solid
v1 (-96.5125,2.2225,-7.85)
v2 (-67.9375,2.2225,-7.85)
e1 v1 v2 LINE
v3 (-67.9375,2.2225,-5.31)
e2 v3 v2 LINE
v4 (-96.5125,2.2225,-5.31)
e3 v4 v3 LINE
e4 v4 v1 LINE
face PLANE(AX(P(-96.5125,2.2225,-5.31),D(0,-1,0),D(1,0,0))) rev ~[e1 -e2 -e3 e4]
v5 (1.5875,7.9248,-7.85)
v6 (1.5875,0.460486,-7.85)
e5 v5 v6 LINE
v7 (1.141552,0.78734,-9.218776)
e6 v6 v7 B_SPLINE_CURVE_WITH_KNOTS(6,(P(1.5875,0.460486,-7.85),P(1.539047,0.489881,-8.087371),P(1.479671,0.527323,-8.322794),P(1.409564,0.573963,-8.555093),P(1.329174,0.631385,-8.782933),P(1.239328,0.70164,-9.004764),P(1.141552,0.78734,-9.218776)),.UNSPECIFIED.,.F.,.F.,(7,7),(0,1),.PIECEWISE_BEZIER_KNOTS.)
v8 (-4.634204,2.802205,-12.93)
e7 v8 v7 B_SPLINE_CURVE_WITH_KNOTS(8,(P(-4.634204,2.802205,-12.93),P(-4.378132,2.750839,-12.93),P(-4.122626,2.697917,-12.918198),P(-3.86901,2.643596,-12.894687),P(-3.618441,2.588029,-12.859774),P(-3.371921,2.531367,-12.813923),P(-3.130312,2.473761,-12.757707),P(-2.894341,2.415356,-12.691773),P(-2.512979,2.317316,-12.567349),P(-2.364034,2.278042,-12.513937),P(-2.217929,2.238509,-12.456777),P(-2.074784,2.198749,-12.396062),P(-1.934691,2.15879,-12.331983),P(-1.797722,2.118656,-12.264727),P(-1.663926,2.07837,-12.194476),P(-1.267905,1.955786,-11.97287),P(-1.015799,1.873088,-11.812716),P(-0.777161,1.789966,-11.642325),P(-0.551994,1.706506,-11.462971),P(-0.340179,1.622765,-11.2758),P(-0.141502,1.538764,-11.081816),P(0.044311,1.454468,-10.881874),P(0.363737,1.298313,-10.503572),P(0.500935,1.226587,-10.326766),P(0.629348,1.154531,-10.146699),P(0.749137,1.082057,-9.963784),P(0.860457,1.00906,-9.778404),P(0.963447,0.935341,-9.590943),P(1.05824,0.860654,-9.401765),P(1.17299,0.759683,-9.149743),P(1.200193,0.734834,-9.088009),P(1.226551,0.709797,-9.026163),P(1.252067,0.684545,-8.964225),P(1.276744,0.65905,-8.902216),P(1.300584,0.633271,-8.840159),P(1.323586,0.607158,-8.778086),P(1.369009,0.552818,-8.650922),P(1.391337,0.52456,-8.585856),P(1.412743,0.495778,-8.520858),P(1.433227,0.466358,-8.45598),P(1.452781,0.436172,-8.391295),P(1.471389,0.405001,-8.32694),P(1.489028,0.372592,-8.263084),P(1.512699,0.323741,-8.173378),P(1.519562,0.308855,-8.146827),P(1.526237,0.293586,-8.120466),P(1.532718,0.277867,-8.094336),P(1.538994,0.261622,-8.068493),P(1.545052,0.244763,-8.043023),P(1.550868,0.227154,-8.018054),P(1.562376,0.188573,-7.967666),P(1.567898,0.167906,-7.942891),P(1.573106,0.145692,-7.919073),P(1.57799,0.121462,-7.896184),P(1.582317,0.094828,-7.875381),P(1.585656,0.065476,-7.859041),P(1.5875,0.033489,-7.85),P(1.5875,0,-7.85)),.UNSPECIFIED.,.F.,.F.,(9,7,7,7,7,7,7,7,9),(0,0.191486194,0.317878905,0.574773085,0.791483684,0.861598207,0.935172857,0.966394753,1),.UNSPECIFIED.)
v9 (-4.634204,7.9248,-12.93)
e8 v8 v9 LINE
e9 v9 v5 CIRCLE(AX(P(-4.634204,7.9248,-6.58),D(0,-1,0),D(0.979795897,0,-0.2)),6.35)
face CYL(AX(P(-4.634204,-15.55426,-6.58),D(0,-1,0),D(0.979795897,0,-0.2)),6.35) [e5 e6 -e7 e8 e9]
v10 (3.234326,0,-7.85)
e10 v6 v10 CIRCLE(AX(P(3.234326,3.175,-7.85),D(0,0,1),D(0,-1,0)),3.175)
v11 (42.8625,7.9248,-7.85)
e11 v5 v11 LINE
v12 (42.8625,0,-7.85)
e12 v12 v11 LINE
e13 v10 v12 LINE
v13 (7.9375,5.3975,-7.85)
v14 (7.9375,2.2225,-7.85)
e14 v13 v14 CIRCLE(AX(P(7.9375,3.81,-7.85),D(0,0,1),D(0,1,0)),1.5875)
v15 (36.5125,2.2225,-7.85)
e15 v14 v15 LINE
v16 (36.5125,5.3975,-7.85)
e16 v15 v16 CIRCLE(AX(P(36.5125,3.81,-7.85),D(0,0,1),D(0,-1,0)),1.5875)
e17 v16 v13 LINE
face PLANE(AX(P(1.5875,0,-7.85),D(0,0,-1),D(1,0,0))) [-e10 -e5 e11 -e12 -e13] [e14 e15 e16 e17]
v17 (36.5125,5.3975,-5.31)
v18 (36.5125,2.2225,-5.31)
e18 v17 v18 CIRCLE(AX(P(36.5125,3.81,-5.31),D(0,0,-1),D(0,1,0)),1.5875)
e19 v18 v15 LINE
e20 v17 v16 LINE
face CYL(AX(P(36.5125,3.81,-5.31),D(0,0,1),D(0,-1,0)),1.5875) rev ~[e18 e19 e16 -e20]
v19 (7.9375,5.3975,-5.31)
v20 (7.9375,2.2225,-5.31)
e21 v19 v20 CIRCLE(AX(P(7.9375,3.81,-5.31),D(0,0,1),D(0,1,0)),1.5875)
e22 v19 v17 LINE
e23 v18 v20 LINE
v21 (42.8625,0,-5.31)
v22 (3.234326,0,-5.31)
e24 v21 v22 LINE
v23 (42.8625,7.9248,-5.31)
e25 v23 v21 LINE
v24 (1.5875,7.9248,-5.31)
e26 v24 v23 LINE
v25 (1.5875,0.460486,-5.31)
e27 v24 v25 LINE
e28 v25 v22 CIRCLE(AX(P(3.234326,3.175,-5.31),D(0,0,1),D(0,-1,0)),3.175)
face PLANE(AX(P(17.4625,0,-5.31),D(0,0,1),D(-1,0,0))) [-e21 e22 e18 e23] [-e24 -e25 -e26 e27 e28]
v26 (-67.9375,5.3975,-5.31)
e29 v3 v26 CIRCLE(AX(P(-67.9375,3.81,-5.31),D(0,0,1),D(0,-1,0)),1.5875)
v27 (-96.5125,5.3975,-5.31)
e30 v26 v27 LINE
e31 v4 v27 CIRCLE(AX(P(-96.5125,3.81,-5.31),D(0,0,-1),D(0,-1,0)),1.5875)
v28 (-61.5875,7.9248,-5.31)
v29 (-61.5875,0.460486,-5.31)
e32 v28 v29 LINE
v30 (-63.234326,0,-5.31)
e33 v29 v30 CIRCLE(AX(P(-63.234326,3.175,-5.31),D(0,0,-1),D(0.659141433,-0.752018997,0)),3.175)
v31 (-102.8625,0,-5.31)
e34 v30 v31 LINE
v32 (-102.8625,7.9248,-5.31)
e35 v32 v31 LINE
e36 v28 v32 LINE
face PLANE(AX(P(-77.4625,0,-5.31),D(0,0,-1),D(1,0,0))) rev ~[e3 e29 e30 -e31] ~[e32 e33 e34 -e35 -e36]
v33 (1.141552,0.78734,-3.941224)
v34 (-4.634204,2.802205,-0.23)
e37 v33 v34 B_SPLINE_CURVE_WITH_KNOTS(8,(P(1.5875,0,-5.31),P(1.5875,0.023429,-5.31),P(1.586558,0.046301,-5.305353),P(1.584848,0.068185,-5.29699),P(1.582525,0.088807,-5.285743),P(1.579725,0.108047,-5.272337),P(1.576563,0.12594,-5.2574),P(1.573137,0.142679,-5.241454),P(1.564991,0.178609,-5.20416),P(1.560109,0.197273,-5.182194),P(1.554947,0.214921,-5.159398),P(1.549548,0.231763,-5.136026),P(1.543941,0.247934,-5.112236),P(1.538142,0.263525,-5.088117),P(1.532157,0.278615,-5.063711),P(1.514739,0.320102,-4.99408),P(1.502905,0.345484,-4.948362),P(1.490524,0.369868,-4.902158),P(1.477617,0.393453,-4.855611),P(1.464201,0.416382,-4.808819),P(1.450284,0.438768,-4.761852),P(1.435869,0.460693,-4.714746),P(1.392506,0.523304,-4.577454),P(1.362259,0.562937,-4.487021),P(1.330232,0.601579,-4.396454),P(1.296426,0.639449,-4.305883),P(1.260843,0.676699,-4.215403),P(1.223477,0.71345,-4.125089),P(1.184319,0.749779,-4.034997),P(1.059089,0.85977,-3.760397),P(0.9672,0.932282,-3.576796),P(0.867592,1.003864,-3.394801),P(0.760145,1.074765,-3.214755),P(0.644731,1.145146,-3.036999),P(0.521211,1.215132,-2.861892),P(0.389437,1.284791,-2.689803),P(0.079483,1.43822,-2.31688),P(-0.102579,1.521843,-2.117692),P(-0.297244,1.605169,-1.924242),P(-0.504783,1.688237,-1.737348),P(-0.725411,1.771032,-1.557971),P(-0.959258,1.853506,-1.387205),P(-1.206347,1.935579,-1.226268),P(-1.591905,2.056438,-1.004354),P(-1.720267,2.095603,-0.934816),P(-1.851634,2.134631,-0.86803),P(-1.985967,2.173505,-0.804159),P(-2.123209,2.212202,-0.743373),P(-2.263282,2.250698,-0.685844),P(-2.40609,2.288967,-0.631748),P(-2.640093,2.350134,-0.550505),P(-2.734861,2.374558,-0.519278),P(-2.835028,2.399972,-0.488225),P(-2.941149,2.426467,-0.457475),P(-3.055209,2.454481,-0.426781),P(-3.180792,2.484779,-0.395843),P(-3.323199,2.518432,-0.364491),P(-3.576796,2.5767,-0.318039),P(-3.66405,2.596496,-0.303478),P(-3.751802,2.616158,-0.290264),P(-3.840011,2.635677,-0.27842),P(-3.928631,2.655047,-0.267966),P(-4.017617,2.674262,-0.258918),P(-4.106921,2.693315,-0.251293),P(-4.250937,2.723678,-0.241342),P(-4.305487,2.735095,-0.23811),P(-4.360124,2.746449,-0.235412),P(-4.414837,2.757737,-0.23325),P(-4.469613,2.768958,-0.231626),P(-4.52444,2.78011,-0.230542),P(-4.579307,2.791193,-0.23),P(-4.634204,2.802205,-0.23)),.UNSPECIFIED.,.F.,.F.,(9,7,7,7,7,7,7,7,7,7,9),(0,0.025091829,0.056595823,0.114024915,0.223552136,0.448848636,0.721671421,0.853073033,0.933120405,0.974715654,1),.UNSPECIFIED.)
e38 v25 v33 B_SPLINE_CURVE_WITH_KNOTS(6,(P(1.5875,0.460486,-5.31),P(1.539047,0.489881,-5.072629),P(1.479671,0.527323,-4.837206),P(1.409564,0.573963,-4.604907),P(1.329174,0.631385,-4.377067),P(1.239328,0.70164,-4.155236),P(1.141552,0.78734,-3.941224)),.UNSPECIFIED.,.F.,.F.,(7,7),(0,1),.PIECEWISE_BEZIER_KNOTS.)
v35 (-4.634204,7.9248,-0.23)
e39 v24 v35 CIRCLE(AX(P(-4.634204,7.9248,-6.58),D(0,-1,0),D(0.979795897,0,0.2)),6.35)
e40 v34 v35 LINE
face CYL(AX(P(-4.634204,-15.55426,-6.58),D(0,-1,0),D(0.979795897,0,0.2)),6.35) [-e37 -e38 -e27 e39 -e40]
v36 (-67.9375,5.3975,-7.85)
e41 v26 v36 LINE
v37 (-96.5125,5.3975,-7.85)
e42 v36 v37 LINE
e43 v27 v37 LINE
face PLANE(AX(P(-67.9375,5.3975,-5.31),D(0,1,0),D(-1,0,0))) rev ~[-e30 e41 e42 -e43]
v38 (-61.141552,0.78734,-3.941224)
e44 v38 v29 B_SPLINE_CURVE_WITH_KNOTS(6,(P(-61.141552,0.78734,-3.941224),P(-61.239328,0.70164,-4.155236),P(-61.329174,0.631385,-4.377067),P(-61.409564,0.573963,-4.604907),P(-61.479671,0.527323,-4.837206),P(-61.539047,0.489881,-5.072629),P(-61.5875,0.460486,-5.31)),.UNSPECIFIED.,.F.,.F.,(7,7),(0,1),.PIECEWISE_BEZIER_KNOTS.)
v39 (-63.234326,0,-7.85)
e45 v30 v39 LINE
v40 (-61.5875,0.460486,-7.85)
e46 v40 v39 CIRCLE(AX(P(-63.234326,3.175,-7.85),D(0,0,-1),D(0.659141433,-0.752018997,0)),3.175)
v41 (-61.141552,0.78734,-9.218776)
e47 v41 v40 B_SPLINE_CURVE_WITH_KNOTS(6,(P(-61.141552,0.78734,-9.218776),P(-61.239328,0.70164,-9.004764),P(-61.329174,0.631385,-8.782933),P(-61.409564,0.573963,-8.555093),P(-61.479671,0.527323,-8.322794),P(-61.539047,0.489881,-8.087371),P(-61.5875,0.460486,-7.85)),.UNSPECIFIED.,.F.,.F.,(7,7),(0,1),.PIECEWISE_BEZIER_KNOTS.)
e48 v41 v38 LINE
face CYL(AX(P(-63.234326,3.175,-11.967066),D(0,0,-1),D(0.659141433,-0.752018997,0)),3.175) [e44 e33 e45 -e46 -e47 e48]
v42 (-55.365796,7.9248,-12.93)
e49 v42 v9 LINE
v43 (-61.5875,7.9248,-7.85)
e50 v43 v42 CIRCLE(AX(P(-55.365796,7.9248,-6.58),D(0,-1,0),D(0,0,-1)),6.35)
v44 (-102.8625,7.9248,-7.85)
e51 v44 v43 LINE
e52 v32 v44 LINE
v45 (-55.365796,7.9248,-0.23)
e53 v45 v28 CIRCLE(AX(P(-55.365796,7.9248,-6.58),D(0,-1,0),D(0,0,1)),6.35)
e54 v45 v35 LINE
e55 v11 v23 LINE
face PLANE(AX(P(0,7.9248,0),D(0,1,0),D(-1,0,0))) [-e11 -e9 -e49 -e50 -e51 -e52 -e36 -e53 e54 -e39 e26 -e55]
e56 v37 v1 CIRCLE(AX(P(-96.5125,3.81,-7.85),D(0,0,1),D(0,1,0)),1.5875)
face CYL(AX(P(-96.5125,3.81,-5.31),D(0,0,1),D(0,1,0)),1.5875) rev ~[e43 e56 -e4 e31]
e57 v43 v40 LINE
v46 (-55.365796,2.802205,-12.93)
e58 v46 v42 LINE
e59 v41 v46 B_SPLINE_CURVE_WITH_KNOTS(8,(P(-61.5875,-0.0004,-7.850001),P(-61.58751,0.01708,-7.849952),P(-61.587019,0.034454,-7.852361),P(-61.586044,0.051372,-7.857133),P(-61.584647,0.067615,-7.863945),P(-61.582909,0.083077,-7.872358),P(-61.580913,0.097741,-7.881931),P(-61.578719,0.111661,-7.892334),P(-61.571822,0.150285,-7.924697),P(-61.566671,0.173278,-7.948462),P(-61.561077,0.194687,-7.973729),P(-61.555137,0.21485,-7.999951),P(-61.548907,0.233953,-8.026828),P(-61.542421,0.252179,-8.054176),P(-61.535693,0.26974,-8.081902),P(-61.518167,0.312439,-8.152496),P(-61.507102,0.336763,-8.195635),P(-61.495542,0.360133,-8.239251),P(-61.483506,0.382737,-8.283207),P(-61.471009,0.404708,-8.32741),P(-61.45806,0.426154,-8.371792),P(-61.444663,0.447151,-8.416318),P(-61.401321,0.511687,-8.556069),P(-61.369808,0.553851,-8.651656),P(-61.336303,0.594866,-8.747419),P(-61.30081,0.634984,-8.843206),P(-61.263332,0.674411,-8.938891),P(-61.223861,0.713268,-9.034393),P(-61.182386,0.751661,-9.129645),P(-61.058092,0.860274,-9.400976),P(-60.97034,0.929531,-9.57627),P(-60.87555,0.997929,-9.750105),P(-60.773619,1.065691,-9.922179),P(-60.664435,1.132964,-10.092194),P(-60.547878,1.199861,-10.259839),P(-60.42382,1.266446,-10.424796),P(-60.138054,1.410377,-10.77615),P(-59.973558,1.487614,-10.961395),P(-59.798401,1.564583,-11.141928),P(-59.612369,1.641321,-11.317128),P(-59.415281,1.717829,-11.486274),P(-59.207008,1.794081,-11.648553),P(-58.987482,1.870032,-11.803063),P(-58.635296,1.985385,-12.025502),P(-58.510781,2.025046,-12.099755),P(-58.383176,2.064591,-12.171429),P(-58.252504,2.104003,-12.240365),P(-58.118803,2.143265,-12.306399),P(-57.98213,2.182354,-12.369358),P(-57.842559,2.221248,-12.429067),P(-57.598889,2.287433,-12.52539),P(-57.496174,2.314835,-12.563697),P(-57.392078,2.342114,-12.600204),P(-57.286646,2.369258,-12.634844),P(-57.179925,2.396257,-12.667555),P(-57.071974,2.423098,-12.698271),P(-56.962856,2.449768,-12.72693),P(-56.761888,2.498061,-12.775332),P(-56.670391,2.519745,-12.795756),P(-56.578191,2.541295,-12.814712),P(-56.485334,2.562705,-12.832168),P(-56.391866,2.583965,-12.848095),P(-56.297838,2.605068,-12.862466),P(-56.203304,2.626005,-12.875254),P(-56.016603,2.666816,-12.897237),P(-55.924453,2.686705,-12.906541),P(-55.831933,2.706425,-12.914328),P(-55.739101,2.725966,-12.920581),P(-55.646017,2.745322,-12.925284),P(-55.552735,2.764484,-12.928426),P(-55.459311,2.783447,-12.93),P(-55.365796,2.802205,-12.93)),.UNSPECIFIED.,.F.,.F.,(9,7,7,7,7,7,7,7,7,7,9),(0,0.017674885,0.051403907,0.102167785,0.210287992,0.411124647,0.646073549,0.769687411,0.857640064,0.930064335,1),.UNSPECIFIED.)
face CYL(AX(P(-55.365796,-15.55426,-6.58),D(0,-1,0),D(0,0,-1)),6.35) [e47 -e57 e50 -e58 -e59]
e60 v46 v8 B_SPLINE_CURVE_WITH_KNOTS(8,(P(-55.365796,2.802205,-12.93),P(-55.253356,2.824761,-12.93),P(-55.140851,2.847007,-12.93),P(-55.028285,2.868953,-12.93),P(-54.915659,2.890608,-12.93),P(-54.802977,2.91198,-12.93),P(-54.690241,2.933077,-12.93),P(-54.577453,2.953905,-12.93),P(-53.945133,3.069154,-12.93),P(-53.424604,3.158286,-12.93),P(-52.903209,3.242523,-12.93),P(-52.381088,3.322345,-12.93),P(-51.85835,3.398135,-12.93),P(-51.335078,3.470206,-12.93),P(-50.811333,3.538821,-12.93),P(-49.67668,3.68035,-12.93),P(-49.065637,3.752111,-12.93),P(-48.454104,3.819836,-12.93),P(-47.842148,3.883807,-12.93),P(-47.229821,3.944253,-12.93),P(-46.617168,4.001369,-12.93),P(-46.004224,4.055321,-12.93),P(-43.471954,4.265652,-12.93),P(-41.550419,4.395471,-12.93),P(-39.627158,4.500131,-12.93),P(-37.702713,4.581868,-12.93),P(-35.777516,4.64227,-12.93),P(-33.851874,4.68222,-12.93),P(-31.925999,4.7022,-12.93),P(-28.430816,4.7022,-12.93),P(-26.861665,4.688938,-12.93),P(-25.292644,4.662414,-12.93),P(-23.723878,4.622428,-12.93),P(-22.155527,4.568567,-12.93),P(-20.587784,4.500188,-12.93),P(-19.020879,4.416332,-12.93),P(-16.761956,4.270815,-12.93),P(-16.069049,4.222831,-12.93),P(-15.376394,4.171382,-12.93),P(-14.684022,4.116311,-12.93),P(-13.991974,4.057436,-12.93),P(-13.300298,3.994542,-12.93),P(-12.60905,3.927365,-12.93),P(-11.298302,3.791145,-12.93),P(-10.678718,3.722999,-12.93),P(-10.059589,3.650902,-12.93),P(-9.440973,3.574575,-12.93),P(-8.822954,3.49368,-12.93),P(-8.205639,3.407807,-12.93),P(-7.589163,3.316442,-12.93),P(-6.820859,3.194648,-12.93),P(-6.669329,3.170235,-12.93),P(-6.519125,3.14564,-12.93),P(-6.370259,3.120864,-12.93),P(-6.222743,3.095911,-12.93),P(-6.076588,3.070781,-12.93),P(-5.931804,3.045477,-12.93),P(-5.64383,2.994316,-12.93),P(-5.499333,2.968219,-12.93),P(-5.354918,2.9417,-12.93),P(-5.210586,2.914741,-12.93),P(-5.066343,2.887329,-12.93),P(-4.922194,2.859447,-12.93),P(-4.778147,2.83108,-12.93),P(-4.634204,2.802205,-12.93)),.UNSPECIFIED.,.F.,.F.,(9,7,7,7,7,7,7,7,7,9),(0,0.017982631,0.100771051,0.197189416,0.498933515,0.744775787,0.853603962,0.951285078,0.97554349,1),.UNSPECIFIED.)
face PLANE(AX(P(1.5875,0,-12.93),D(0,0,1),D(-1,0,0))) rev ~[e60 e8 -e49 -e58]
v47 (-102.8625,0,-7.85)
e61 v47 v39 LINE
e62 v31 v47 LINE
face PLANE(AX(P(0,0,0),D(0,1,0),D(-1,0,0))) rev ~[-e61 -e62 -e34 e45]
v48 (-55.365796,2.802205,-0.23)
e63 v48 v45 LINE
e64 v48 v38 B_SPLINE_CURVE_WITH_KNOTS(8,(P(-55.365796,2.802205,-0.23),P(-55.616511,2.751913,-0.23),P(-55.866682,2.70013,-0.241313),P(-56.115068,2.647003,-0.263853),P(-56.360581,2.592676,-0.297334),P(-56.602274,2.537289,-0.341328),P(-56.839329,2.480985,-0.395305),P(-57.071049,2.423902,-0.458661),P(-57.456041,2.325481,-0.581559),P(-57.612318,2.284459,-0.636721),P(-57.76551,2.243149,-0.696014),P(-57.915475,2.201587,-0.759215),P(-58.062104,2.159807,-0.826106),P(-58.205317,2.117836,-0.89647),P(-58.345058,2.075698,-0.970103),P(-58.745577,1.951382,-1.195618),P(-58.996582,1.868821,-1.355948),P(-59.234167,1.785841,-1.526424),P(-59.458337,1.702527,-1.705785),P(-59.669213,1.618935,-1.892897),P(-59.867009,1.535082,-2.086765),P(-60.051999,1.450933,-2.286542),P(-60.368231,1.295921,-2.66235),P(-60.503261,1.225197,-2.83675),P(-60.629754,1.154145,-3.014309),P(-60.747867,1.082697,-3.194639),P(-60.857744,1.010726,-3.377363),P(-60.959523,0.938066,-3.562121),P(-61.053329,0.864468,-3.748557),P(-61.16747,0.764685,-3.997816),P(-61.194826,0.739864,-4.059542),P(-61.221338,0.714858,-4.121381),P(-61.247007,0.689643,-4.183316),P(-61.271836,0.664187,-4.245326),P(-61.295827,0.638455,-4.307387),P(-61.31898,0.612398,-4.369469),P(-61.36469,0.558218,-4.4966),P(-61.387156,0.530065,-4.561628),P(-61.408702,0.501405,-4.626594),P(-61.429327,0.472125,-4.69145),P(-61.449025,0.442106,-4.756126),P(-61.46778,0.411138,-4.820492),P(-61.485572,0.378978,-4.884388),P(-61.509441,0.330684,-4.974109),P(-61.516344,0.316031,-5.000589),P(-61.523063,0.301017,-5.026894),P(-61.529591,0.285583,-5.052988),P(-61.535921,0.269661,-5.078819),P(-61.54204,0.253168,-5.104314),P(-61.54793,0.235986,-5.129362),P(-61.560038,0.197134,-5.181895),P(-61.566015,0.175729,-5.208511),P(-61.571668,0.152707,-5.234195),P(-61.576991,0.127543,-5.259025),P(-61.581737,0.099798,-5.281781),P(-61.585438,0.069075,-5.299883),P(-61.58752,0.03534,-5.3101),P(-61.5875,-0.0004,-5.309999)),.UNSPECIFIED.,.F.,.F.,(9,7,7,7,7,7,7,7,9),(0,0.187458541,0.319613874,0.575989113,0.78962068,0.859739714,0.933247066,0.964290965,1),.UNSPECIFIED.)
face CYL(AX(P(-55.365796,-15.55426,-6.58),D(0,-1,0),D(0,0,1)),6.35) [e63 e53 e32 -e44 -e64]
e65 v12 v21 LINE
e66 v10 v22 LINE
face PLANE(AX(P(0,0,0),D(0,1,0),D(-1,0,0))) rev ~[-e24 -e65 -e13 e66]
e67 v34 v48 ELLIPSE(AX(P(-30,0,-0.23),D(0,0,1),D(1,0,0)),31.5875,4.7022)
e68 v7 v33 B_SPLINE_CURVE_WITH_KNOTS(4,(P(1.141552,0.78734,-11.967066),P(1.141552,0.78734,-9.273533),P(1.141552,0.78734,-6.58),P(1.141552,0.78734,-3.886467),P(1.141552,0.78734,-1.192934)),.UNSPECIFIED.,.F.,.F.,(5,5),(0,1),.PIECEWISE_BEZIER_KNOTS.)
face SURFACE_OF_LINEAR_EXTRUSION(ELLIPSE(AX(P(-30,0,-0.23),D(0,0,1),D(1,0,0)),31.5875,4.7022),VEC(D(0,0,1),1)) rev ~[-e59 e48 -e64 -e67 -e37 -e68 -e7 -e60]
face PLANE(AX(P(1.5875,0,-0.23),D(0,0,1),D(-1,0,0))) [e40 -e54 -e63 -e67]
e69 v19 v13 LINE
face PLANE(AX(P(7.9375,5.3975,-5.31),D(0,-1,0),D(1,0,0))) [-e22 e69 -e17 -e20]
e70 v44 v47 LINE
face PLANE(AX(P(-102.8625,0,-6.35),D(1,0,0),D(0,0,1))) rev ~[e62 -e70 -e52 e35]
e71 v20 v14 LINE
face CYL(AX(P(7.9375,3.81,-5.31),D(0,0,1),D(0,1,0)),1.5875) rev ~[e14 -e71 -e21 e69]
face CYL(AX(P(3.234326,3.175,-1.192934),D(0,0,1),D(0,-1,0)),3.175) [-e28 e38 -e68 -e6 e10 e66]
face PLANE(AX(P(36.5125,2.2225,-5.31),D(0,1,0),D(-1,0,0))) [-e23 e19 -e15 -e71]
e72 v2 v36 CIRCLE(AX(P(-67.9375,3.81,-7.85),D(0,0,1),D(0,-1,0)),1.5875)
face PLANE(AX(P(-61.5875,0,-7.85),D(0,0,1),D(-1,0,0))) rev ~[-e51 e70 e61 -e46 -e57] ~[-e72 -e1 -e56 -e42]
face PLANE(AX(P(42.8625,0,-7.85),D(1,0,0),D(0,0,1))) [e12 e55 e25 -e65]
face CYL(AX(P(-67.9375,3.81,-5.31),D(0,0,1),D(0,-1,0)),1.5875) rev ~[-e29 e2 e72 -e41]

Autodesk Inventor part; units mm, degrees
ref_plane "YZ Plane" through (0, 0, 0) normal (1, 0, 0) x (0, 1, 0)
ref_plane "XZ Plane" through (0, 0, 0) normal (0, 1, 0) x (-1, 0, 0)
ref_plane "XY Plane" through (0, 0, 0) normal (0, 0, 1) x (1, 0, 0)
sketch "Sketch1" plane through (0, 0, 0) normal (0, 1, 0) x (-1, 0, 0)
  line L0 (-17.4625, -7.85) -> (-17.4625, -5.31)
  line L1 (-17.4625, -6.35) -> (-17.4625, -5.31)
  line L2 (-17.4625, -5.31) -> (-1.5875, -5.31)
  line L3 (-1.5875, -7.85) -> (-17.4625, -7.85)
  line L4 (-1.5875, -5.31) -> (-1.5875, -0.23)
  line L5 (-1.5875, -7.85) -> (-1.5875, -12.93)
  line L6 (-1.5875, -0.23) -> (30, -0.23)
  line L7 (-1.5875, -12.93) -> (30, -12.93)
  line L8 (30, -12.93) -> (30, -0.23)
  line L9 (61.5875, -7.85) -> (77.4625, -7.85)
  line L10 (77.4625, -5.31) -> (61.5875, -5.31)
  line L11 (77.4625, -7.85) -> (77.4625, -5.31)
  line L12 (77.4625, -6.35) -> (77.4625, -5.31)
  line L13 (61.5875, -7.85) -> (61.5875, -12.93)
  line L14 (61.5875, -5.31) -> (61.5875, -0.23)
  line L15 (61.5875, -0.23) -> (30, -0.23)
  line L16 (61.5875, -12.93) -> (30, -12.93)
  point P0 (-17.4625, -6.58)
  point P1 (77.4625, -6.58)
  dimension "d135" = 6.35
  dimension "d136" = 2.54
extrude "Extrusion1" add sketch "Sketch1" along normal blind 12.7
fillet "Fillet2" radius 6.35 4 edges at (1.5875, 6.35, -12.93) (1.5875, 6.35, -0.23) (-61.5875, 6.35, -12.93) (-61.5875, 6.35, -0.23)
move faces "Move4" translate (25.4, 0, 0) faces at (17.4625, 4.2333, -6.1567)
move faces "Move5" translate (-25.4, 0, 0) faces at (-77.4625, 4.2333, -7.0033)
sketch "Sketch6" plane through (-55.3658, 0, -0.23) normal (0, 0, 1) x (1, 0, 0)
  line L0 (50.7316, 0) -> (0, 0) projected
  line L1 (56.9533, 0) -> (50.7316, 0) projected
  ellipse E0 centre (25.3658, 0) end of major axis (56.9533, 0) minor radius 4.7022
  point P0 (55.3658, 0)
extrude "Extrusion18" cut sketch "Sketch6" against normal blind 20.6375
fillet "Fillet4" radius 3.175 2 edges at (-61.5875, 0, -6.58) (1.5875, 0, -6.58)
sketch "Sketch7" plane through (-102.8625, 12.7, -5.31) normal (0, 0, 1) x (1, 0, 0)
  line L0 (41.275, -12.2395) -> (41.275, 0) projected
  line L1 (41.275, -6.1198) -> (50.8, -6.1198) construction
  line L2 (0, -12.7) -> (0, 0) projected
  line L3 (41.275, -6.35) -> (47.625, -6.35) construction
  line L4 (98.2283, 0) -> (47.4967, 0) projected
  line L5 (72.8625, 0) -> (72.8625, -18.9978)
  line L6 (0, -12.7) -> (39.6282, -12.7) projected
  arc A0 (34.925, -10.4775) -> (34.925, -7.3025) centre (34.925, -8.89) ccw
  line L7 (0, -8.89) -> (6.35, -8.89)
  arc A1 (6.35, -7.3025) -> (6.35, -10.4775) centre (6.35, -8.89) ccw
  line L8 (34.925, -7.3025) -> (6.35, -7.3025)
  line L9 (6.35, -10.4775) -> (34.925, -10.4775)
  arc A2 (110.8, -7.3025) -> (110.8, -10.4775) centre (110.8, -8.89) ccw
  line L10 (145.725, -8.89) -> (139.375, -8.89)
  arc A3 (139.375, -10.4775) -> (139.375, -7.3025) centre (139.375, -8.89) ccw
  line L11 (110.8, -7.3025) -> (139.375, -7.3025)
  line L12 (139.375, -10.4775) -> (110.8, -10.4775)
  point P0 (102.8625, -12.7)
  dimension "d161" = 3.175
  dimension "d162" = 6.35
  dimension "d163" = 3.175
extrude "Extrusion19" cut sketch "Sketch7" against normal blind 20.6375
move faces "Move6" translate (0, -4.7752, 0) faces at (-21.5447, 12.7, -4.4633)
properties part number "AllFretBars"
